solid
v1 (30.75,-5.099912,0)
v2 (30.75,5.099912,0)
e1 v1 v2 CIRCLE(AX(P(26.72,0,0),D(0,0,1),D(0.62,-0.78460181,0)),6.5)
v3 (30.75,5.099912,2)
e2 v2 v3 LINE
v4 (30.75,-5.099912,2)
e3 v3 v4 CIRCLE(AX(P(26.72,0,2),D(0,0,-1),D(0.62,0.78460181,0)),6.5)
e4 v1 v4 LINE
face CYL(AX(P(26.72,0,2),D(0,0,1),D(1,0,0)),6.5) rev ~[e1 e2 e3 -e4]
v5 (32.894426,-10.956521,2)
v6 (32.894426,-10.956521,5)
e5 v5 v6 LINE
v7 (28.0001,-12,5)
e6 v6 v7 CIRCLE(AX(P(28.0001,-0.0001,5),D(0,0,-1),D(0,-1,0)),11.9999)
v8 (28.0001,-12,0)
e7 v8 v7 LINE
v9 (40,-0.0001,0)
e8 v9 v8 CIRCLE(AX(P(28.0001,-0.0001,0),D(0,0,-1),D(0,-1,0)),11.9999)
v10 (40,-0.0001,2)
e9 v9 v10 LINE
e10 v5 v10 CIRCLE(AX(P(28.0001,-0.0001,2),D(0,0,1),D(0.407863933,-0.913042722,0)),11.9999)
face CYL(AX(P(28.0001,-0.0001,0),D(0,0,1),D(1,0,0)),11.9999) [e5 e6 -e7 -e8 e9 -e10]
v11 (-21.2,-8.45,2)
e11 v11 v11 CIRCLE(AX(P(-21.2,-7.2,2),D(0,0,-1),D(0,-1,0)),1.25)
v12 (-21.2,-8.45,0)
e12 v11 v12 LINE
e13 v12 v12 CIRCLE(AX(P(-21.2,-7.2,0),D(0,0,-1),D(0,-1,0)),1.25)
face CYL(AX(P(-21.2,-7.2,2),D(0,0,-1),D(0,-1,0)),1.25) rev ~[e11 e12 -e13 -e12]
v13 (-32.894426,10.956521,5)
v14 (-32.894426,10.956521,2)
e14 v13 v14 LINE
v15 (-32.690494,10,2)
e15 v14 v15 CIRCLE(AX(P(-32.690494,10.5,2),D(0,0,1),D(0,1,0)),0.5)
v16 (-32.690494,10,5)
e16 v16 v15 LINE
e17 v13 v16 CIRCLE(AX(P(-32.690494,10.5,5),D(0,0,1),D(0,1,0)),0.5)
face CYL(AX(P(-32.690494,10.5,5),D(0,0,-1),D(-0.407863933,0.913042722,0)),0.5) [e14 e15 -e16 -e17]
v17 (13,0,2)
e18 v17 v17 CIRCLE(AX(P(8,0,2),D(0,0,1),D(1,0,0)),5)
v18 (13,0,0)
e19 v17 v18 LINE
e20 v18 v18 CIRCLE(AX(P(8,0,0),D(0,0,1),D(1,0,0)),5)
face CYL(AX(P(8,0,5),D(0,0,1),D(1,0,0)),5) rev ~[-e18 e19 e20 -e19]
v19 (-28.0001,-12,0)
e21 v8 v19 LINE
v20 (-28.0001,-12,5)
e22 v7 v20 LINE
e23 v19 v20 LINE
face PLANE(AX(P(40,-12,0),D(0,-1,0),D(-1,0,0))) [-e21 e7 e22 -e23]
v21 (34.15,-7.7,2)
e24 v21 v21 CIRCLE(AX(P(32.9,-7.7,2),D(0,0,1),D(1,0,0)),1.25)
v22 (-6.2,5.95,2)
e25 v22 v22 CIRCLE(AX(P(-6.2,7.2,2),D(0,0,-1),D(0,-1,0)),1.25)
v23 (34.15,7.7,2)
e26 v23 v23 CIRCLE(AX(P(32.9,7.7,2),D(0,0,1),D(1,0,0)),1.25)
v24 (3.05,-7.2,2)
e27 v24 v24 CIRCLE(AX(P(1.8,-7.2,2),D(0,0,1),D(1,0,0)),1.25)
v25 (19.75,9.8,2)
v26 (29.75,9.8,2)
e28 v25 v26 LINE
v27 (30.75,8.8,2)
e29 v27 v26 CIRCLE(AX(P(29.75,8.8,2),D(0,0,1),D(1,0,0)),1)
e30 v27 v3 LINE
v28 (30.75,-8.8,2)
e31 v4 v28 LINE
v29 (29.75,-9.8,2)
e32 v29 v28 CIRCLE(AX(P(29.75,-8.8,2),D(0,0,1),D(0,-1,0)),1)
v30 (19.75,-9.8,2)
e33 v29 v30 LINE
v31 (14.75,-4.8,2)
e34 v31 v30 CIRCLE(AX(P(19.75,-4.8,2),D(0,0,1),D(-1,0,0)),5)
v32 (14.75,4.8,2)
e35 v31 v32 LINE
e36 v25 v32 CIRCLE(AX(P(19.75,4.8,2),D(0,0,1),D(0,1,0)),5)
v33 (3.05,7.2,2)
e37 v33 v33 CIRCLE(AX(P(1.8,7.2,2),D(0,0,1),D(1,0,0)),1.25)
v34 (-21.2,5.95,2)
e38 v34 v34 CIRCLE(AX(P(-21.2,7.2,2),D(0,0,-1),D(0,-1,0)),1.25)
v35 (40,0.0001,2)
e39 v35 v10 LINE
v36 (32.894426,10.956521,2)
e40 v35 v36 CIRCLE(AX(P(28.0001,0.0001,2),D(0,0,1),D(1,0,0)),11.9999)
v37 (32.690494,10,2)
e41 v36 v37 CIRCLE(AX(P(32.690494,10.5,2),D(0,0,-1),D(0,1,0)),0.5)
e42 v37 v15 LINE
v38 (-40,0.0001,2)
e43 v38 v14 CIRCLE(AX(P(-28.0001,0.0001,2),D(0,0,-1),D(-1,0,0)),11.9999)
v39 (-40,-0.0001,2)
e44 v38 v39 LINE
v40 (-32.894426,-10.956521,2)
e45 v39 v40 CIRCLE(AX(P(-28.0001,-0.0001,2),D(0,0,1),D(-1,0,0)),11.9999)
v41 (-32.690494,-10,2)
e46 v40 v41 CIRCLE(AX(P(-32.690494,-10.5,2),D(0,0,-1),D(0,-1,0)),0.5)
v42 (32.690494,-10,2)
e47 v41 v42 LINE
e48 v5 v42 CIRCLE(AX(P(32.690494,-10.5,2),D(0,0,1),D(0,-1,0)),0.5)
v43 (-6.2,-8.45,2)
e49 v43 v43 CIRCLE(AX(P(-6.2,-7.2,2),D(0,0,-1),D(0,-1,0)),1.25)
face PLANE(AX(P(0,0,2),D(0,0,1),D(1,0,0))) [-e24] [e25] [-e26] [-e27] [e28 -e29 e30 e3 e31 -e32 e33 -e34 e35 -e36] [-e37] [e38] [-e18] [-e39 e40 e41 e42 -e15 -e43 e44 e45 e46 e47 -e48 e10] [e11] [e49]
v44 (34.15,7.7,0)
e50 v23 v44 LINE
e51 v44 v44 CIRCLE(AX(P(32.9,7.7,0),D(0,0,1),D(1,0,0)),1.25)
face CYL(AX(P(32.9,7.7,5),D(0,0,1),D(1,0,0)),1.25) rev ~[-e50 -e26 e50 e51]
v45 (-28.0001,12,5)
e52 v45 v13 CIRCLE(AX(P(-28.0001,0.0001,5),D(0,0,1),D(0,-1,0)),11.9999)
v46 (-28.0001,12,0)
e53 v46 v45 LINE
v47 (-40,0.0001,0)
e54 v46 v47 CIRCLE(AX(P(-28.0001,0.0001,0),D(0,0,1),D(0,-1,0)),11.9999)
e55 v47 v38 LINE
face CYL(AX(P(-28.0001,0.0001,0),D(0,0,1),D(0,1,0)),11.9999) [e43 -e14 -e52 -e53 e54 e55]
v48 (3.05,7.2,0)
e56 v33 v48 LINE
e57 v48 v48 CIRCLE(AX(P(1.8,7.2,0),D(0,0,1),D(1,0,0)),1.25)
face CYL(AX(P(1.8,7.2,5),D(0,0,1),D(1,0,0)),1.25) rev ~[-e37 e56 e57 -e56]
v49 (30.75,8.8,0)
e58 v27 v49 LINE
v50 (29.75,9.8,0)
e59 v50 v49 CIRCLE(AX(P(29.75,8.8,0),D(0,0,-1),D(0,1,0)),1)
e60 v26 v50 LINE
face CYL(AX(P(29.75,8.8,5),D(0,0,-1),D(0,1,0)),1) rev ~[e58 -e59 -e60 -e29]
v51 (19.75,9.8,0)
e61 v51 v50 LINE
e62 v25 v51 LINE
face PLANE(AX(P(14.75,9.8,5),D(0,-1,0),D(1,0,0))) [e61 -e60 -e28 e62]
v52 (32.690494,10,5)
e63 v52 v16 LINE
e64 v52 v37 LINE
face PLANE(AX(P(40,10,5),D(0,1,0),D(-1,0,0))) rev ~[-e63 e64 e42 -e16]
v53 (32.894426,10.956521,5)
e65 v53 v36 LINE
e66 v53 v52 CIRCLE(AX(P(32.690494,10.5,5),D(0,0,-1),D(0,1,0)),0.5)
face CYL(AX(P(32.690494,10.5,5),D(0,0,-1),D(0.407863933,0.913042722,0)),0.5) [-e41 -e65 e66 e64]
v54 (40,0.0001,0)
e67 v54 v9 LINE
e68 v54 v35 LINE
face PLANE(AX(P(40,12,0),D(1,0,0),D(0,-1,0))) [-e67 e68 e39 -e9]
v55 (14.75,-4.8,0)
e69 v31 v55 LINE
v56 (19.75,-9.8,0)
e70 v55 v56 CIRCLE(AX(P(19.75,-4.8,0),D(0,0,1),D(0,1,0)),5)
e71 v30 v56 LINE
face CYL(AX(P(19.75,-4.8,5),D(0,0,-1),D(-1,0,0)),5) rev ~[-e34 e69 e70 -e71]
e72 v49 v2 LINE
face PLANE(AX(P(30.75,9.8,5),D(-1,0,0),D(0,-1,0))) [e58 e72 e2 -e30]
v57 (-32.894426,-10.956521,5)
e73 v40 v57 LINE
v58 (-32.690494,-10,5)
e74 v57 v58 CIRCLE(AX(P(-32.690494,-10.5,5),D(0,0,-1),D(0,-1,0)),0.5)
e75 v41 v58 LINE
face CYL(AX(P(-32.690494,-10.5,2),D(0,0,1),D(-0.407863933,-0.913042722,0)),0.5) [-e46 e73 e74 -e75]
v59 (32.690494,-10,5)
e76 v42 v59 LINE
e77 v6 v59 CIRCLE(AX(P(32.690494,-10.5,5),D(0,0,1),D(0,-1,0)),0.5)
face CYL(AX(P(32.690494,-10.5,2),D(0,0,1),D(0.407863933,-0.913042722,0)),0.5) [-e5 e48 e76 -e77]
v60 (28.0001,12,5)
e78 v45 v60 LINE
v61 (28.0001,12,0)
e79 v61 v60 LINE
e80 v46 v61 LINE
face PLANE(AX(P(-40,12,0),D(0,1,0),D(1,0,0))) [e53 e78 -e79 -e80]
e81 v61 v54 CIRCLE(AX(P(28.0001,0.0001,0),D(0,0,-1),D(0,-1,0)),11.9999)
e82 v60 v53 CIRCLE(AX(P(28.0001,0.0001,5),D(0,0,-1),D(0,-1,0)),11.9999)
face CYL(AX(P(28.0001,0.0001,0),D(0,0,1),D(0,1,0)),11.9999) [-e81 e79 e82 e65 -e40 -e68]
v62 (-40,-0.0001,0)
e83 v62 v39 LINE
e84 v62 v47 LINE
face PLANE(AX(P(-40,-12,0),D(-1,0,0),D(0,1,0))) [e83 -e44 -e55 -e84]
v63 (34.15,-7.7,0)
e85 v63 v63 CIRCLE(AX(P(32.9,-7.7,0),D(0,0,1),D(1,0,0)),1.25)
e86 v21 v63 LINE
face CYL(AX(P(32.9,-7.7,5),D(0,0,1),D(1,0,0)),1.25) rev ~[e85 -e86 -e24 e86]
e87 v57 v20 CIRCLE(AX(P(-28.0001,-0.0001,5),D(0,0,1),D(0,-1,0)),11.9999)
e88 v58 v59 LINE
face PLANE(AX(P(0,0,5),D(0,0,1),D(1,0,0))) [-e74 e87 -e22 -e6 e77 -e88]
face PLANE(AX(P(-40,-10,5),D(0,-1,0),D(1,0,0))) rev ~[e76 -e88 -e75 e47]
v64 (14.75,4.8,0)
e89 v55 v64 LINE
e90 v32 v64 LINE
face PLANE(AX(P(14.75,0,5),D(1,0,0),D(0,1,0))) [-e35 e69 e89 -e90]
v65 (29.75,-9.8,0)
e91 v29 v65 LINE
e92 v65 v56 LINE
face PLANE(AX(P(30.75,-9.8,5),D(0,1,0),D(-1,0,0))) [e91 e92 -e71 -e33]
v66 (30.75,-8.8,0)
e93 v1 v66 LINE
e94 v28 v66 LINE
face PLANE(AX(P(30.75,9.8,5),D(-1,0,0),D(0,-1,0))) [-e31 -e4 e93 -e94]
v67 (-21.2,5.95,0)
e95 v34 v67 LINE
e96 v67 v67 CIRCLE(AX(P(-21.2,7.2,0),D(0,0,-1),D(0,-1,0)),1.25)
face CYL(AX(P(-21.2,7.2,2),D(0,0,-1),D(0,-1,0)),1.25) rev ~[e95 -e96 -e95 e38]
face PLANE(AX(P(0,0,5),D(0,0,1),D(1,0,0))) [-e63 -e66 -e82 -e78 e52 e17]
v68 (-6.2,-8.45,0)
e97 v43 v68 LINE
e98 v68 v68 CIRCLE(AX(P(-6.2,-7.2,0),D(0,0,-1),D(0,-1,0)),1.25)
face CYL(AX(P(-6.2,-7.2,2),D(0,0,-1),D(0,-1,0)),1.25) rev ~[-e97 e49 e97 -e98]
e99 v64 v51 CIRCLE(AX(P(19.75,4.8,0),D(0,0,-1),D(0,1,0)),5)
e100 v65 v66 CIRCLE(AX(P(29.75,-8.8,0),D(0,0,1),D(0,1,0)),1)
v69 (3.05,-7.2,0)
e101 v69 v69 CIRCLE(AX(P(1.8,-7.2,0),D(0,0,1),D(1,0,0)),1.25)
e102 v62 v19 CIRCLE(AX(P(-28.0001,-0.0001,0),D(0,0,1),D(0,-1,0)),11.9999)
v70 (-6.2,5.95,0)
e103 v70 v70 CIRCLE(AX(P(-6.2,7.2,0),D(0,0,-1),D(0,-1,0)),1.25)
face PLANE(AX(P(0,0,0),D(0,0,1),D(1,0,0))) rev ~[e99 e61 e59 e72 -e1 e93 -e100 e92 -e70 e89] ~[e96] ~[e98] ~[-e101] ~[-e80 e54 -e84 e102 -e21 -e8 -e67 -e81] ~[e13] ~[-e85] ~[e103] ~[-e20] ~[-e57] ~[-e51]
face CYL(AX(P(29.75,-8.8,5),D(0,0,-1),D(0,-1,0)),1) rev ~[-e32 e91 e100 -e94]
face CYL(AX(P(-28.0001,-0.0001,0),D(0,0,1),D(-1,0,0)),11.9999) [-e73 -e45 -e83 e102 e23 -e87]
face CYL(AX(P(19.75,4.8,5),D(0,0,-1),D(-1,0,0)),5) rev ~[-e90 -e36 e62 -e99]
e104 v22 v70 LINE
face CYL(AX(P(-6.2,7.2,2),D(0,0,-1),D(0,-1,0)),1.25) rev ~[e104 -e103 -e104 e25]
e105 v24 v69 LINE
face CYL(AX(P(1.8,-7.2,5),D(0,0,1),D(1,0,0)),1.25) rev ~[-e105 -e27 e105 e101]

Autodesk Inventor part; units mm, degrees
ref_plane "YZ Plane" through (0, 0, 0) normal (1, 0, 0) x (0, 1, 0)
ref_plane "XZ Plane" through (0, 0, 0) normal (0, 1, 0) x (-1, 0, 0)
ref_plane "XY Plane" through (0, 0, 0) normal (0, 0, 1) x (1, 0, 0)
sketch "スケッチ1" plane through (0, 0, 0) normal (0, 0, 1) x (1, 0, 0)
  line L0 (-40, 12) -> (40, 12)
  line L1 (40, 12) -> (40, -12)
  line L2 (40, -12) -> (-40, -12)
  line L3 (-40, -12) -> (-40, 12)
  point P0 (0, 0)
  dimension "d0" = 80
  dimension "d1" = 24
  dimension "d2" = 12
  dimension "d3" = 40
extrude "押し出し1" add sketch "スケッチ1" along normal blind 5
sketch "スケッチ2" plane through (0, 0, 5) normal (0, 0, 1) x (1, 0, 0)
  line L0 (-0.8, 9.8) -> (35, 9.8)
  line L1 (35, 9.8) -> (35, -9.8)
  line L2 (35, -9.8) -> (-0.8, -9.8)
  line L3 (-0.8, -9.8) -> (-0.8, 9.8)
  line L4 (35, 9.8) -> (30.75, 9.8)
  line L5 (30.75, 9.8) -> (30.75, -9.8)
  line L6 (30.75, -9.8) -> (35, -9.8)
  line L7 (35, -9.8) -> (35, 9.8)
  line L8 (30.75, -9.8) -> (14.75, -9.8)
  line L9 (14.75, -9.8) -> (14.75, 9.8)
  line L10 (14.75, 9.8) -> (30.75, 9.8)
  line L11 (30.75, 9.8) -> (30.75, -9.8)
  circle A0 centre (8, 0) radius 5
  line L12 (35, 0) -> (-0.8, 0)
  circle A1 centre (1.8, 7.2) radius 1.25
  circle A2 centre (32.9, 7.7) radius 1.25
  circle A3 centre (1.8, -7.2) radius 1.25
  circle A4 centre (32.9, -7.7) radius 1.25
  line L13 (40, 12) -> (40, -12) projected
  point P0 (0, 0)
  dimension "d6" = 35.8
  dimension "d7" = 19.6
  dimension "d8" = 9.8
  dimension "d10" = 4.25
  dimension "d11" = 16
  dimension "d12" = 10
  dimension "d13" = 27
  dimension "d14" = 14.4
  dimension "d15" = 15.4
  dimension "d16" = 31.1
  dimension "d17" = 2.1
  dimension "d18" = 2.5
  dimension "d19" = 2.5
  dimension "d47" = 5
extrude "押し出し2" cut sketch "スケッチ2" against normal through all contours L0 L5 L12 L9 | L12 L5 L2 L9 | L12 A0 | A0 L12 | A1 | A2 | A3 | A4
fillet "フィレット1" radius 5 2 edges at (14.75, 9.8, 2.5) (14.75, -9.8, 2.5)
fillet "フィレット2" radius 1 2 edges at (30.75, 9.8, 2.5) (30.75, -9.8, 2.5)
sketch "スケッチ5" plane through (0, 0, 5) normal (0, 0, 1) x (1, 0, 0)
  line L0 (40, 12) -> (40, -12) projected
  line L1 (29.75, -9.8) -> (19.75, -9.8) projected
  arc A0 (14.75, -4.8) -> (19.75, -9.8) centre (19.75, -4.8) ccw projected
  line L2 (14.75, -4.8) -> (14.75, 4.8) projected
  arc A1 (19.75, 9.8) -> (14.75, 4.8) centre (19.75, 4.8) ccw projected
  line L3 (19.75, 9.8) -> (29.75, 9.8) projected
  arc A2 (30.75, 8.8) -> (29.75, 9.8) centre (29.75, 8.8) ccw projected
  line L4 (30.75, 8.8) -> (30.75, -8.8) projected
  arc A3 (29.75, -9.8) -> (30.75, -8.8) centre (29.75, -8.8) ccw projected
  circle A4 centre (32.9, -7.7) radius 1.25 projected
  circle A5 centre (1.8, -7.2) radius 1.25 projected
  circle A6 centre (32.9, 7.7) radius 1.25 projected
  circle A7 centre (1.8, 7.2) radius 1.25 projected
  circle A8 centre (8, 0) radius 5 projected
  line L5 (40, 10) -> (-40, 10)
  line L6 (-40, 10) -> (-40, -10)
  line L7 (-40, -10) -> (40, -10)
  line L8 (40, -10) -> (40, 10)
  point P0 (-32.5, 14.4762)
  point P1 (-32.5, -14.4762)
  point P2 (0, 0)
  dimension "d41" = 20
  dimension "d42" = 10
  dimension "d49" = 41.8
extrude "押し出し4" cut sketch "スケッチ5" against normal blind 3
fillet "フィレット3" radius 12 4 edges at (40, -12, 2.5) (40, 12, 2.5) (-40, -12, 2.5) (-40, 12, 2.5)
fillet "フィレット4" radius 0.5 4 edges at (-34.6333, -10, 3.5) (-34.6333, 10, 3.5) (34.6333, 10, 3.5) (34.6333, -10, 3.5)
sketch "スケッチ6" plane through (0, 0, 2) normal (0, 0, 1) x (1, 0, 0)
  circle A0 centre (32.9, -7.7) radius 1.25 projected
  circle A1 centre (26.72, 0) radius 6.5
  point P0 (0, 0)
  dimension "d52" = 13
  dimension "d53" = 6.18
extrude "押し出し5" cut sketch "スケッチ6" against normal through all contours A1
sketch "スケッチ7" plane through (0, 0, 2) normal (0, 0, 1) x (1, 0, 0)
  circle A0 centre (1.8, -7.2) radius 1.25 projected
  circle A1 centre (1.8, 7.2) radius 1.25 projected
  point P0 (0, 0)
  point P1 (-6.2, 7.2)
  point P2 (-6.2, -7.2)
  point P3 (-21.2, -7.2)
  point P4 (-21.2, 7.2)
  point P5 (-6.2, 7.2)
  point P6 (-21.2, 7.2)
  dimension "d56" = 15
  dimension "d57" = 15
  dimension "d58" = 8
  dimension "d59" = 8
  dimension "d60" = 7.2
  dimension "d61" = 7.2
  dimension "d62" = 7.2
  dimension "d63" = 7.2
hole "Hole2" at (-6.2, 7.2, 2) at (-6.2, -7.2, 2) at (-21.2, -7.2, 2) at (-21.2, 7.2, 2) direction (0, 0, -1) diameter 2.5 end through all
equation "\"d2\" = 0.5 * d1"
equation "\"d3\" = 0.5 * d0"
equation "\"d8\" = 0.5 * d7"
equation "\"d42\" = 0.5 * d41"
equation "\"d57\" = d56"
equation "\"d59\" = d58"
properties part number "JointD0"
